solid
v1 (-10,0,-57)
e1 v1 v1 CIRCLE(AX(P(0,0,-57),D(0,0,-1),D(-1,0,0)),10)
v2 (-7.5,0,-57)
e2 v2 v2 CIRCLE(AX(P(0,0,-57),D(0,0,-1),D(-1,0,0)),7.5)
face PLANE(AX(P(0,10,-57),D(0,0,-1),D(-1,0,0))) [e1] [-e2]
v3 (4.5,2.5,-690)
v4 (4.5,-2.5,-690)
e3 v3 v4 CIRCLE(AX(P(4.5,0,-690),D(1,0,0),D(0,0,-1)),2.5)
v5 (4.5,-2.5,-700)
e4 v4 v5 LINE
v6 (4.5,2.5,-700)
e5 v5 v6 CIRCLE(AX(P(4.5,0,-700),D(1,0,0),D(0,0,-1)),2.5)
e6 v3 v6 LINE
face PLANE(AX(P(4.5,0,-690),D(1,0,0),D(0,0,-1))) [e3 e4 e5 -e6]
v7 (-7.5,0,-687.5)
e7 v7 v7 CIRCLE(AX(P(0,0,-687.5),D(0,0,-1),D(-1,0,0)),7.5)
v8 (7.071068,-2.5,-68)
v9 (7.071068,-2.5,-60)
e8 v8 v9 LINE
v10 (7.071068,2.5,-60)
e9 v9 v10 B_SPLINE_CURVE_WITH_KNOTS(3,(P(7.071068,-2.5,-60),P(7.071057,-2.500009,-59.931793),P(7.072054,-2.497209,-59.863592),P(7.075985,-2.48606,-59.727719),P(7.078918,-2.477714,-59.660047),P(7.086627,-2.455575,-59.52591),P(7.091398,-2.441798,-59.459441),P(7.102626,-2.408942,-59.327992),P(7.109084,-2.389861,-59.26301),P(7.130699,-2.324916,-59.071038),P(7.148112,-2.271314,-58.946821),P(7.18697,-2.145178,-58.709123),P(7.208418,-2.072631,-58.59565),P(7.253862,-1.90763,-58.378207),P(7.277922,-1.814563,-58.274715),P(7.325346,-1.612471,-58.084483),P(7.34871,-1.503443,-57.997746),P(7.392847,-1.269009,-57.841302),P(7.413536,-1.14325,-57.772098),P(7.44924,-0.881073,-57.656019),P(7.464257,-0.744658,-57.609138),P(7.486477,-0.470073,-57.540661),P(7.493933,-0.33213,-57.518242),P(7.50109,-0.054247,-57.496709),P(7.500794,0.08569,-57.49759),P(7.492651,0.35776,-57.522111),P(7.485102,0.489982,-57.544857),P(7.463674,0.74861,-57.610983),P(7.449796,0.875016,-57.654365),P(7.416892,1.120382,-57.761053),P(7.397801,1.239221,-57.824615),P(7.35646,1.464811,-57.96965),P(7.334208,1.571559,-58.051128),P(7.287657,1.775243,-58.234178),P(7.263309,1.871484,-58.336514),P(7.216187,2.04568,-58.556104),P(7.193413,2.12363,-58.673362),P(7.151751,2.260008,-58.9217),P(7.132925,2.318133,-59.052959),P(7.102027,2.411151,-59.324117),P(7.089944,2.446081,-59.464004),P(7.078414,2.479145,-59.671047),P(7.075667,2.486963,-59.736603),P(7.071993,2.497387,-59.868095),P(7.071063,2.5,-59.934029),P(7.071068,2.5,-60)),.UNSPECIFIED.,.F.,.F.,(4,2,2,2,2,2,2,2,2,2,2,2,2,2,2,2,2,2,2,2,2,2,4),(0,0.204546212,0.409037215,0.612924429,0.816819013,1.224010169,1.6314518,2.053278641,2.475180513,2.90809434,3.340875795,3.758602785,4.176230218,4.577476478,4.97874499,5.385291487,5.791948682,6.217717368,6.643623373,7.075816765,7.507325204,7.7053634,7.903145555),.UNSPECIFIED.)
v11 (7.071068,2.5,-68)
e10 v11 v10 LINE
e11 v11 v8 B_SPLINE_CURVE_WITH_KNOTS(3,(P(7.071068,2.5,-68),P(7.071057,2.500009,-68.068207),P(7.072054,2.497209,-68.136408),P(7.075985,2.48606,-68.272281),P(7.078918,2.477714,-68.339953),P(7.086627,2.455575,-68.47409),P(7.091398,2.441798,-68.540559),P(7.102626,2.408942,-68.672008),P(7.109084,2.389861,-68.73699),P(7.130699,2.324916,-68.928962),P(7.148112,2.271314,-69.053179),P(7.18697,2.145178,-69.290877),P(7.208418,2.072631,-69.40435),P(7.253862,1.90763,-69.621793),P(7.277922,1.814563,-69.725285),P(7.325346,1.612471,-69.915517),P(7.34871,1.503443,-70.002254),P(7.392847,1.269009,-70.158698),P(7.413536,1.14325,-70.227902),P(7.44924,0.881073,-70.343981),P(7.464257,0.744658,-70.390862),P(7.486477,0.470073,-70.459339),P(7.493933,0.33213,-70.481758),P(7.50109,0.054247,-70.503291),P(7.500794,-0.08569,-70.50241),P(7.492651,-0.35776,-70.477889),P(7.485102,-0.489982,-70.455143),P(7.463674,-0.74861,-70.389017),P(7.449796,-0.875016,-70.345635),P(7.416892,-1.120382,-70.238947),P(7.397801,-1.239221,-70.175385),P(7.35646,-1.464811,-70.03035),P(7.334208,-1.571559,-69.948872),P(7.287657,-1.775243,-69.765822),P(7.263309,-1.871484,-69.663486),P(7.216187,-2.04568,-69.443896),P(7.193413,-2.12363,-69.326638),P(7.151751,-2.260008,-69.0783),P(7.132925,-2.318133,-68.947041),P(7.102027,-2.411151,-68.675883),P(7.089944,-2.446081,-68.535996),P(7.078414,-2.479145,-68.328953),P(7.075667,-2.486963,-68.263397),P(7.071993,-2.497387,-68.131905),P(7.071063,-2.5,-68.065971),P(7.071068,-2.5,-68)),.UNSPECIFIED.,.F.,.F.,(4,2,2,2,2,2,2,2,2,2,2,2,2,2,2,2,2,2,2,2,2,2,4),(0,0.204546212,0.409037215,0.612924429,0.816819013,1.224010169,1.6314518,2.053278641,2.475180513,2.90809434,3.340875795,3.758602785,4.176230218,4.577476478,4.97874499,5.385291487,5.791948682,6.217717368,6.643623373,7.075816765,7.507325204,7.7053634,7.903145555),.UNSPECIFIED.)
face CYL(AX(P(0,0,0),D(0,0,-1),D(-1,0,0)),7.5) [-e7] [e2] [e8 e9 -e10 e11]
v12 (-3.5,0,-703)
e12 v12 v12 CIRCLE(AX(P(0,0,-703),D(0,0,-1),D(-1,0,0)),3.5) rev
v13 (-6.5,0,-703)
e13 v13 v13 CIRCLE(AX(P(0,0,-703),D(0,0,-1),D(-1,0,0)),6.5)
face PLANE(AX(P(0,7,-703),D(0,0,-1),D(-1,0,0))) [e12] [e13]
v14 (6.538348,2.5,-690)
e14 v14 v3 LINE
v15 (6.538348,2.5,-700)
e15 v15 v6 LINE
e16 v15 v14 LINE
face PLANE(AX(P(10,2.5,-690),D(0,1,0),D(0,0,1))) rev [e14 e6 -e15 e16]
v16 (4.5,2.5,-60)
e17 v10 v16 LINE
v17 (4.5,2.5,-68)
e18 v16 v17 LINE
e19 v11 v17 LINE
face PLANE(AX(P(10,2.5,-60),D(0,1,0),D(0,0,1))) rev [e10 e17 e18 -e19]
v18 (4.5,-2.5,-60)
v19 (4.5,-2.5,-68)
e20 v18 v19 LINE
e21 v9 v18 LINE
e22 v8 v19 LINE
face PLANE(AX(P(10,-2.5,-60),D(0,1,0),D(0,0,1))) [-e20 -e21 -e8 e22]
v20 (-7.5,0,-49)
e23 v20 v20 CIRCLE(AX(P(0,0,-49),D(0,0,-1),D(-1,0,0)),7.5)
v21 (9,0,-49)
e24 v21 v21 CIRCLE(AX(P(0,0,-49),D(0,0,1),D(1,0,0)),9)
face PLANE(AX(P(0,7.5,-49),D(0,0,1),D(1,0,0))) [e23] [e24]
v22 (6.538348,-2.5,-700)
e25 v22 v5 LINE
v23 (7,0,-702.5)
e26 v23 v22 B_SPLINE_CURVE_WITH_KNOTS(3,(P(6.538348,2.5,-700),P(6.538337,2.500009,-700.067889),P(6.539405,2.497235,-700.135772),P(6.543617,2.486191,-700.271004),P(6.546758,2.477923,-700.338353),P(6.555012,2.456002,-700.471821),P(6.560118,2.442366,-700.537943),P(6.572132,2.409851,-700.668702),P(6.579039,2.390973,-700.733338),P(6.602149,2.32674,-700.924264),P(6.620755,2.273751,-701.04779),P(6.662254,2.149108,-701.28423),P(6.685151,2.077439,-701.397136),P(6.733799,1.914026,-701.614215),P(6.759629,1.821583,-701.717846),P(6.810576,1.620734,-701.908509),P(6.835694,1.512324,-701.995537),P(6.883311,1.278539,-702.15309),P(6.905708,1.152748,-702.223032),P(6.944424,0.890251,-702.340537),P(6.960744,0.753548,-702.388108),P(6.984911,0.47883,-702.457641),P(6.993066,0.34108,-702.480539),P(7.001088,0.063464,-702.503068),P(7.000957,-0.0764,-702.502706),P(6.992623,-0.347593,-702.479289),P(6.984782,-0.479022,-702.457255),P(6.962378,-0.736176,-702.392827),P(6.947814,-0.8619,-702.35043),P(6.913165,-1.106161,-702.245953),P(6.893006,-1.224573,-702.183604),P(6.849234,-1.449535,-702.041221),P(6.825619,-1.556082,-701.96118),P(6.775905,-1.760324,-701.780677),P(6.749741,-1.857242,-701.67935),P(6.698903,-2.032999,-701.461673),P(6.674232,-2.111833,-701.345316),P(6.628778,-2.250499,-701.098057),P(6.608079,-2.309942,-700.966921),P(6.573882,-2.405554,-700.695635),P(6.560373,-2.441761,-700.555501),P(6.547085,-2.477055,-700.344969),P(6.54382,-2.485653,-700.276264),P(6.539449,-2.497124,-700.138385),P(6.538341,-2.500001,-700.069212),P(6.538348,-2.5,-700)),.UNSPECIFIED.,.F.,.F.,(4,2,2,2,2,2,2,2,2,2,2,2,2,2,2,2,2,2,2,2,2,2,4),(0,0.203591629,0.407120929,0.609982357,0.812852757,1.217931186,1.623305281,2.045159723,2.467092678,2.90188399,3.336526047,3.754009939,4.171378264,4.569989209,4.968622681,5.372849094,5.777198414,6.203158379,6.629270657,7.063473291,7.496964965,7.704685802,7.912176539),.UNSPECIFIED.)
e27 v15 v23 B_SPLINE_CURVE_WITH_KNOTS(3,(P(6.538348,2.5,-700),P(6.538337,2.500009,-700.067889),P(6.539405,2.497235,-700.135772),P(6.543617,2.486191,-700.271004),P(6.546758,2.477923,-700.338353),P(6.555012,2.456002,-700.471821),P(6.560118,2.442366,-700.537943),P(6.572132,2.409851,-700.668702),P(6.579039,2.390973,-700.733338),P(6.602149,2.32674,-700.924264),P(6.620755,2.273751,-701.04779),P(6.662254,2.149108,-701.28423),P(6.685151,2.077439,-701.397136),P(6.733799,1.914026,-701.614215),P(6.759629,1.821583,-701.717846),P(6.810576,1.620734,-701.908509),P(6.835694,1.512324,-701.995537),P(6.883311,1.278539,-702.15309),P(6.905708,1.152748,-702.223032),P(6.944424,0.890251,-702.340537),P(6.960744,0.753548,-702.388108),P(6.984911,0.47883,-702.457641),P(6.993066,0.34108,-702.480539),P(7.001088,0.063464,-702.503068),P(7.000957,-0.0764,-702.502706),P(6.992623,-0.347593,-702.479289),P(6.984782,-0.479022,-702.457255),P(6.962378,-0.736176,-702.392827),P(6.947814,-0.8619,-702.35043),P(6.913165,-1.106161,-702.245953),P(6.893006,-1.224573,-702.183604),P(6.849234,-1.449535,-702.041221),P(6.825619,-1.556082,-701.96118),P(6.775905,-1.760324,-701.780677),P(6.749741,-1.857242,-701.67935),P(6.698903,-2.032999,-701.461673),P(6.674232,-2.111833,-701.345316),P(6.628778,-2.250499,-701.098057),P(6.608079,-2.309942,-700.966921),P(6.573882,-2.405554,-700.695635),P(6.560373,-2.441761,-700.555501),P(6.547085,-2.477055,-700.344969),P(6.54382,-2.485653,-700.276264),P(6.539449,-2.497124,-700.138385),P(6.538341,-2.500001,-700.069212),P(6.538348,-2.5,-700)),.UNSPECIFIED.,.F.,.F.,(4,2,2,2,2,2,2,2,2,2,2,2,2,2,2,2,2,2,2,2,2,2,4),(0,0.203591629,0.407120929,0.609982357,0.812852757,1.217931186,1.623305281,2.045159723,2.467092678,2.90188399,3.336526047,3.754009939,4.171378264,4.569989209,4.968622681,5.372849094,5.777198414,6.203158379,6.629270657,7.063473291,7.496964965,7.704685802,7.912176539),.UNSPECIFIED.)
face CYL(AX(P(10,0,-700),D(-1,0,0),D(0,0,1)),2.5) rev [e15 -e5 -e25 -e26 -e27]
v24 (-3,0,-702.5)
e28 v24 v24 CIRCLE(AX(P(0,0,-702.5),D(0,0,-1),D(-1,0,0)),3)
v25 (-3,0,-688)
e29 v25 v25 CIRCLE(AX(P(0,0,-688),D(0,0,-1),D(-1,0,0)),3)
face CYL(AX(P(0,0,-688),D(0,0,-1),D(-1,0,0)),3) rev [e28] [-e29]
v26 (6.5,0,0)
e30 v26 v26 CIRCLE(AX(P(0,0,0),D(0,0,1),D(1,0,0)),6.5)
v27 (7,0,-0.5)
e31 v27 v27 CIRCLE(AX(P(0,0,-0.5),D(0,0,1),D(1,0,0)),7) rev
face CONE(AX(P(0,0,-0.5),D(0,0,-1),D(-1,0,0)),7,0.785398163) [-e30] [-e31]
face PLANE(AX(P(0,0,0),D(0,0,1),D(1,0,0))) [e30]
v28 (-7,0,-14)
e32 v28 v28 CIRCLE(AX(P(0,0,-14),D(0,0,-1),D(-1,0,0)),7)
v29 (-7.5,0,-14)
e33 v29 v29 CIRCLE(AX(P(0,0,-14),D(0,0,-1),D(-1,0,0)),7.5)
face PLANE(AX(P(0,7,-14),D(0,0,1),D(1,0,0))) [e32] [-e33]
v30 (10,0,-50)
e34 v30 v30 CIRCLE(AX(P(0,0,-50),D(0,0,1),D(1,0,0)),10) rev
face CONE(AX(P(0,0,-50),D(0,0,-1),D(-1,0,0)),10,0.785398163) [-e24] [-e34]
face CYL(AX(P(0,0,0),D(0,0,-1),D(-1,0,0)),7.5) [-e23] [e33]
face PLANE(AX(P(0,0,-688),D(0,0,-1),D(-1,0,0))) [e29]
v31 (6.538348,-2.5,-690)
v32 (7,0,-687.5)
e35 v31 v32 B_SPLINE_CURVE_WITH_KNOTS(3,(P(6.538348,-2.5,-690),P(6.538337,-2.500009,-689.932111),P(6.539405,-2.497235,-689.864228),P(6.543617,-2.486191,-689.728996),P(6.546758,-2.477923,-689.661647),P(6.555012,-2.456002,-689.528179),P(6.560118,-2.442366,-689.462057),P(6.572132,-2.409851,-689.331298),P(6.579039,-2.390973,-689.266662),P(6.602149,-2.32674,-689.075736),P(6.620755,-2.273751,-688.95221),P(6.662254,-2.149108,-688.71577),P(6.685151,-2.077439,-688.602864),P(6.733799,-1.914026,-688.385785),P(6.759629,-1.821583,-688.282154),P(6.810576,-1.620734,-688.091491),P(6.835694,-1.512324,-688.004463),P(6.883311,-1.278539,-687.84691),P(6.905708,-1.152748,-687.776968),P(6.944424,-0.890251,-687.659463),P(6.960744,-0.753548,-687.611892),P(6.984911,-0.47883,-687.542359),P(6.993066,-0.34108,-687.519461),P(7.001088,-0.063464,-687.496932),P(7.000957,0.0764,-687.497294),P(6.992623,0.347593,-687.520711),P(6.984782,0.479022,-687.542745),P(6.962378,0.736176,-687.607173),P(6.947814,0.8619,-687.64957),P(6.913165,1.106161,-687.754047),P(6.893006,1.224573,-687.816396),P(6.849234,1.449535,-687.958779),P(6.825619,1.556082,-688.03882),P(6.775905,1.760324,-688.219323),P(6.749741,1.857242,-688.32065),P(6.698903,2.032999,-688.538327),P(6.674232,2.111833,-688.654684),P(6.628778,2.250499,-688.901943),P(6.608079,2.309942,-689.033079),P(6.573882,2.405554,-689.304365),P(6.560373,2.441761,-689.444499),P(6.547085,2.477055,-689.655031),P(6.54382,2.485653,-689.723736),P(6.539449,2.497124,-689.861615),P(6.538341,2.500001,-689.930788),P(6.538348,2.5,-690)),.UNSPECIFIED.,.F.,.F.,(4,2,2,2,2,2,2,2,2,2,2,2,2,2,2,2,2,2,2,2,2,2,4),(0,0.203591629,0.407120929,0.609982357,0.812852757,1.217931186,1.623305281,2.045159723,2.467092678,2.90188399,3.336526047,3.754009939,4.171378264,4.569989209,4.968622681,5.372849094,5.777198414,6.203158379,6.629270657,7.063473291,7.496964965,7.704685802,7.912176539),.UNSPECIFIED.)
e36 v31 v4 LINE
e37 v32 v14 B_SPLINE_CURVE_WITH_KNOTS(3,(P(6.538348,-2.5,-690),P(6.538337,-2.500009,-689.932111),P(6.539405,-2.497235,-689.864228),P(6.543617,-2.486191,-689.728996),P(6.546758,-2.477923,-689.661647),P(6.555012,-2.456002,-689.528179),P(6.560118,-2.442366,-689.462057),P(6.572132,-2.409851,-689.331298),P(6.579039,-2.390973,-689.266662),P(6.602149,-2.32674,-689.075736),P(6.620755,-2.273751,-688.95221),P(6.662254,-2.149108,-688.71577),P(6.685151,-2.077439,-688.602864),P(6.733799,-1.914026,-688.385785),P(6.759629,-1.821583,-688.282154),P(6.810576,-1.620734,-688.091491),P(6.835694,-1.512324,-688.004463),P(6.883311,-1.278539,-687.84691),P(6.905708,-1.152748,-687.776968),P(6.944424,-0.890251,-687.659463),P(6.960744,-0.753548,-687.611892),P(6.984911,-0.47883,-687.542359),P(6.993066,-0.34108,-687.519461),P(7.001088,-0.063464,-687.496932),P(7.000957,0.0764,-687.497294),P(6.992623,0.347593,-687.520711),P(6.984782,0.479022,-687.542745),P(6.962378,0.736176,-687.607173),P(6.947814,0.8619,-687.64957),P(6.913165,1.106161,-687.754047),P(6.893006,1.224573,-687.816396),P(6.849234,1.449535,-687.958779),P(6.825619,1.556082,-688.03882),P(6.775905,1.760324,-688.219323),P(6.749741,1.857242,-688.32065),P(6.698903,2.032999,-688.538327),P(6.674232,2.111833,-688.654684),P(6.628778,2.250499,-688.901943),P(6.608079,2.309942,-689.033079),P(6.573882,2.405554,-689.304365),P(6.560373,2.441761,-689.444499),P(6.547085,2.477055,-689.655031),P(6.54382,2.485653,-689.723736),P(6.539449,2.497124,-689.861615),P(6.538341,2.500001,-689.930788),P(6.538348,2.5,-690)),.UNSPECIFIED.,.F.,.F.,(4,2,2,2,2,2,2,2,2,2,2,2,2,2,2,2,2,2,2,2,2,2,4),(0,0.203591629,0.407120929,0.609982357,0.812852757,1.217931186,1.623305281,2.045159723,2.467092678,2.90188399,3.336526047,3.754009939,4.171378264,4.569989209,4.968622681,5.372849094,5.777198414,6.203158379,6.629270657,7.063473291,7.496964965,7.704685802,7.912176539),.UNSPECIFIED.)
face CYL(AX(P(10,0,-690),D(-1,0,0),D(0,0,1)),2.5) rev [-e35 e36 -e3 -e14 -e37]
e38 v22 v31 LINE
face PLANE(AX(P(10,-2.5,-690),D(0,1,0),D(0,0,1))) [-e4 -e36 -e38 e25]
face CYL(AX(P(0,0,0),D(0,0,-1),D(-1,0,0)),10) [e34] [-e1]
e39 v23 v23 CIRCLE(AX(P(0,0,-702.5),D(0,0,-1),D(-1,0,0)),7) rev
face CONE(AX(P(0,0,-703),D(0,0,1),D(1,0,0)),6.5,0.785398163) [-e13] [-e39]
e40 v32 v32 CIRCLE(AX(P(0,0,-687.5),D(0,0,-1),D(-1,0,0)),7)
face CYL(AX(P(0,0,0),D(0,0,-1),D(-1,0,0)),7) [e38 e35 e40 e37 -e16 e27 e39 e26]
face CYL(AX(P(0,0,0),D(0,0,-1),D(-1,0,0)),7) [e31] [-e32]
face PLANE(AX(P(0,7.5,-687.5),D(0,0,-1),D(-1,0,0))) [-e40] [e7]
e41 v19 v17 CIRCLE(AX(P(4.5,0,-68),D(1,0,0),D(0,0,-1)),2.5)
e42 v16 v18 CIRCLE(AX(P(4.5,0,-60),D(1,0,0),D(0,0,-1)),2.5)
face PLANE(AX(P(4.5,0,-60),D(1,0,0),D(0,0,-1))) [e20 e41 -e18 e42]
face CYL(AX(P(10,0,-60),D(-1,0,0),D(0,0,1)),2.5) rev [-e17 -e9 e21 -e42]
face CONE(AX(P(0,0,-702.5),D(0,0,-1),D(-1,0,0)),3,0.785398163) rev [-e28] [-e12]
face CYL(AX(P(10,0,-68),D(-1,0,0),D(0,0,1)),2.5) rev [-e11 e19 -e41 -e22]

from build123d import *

# Parameters (mm, degrees)
CUT_EXTRUDE_1_DEPTH = 704.220626831
CHAMFER_1_SIZE      = 1
SKETCH_3_R          = 3
CUT_EXTRUDE_2_DEPTH = 15
CHAMFER_2_SIZE      = 0.5


with BuildPart() as part:
    # 草图1 → 旋转1 (revolve)
    with BuildSketch(Plane(origin=(0, 0, 0), x_dir=(0, 0, -1), z_dir=(1, 0, 0)), mode=Mode.PRIVATE) as revolve_1_sk:
        Polygon((0, 0), (0, 7), (14, 7), (14, 7.5), (49, 7.5), (49, 10), (57, 10), (57, 7.5), (687.5, 7.5), (687.5, 7), (703, 7), (703, 0), align=None)
    revolve(revolve_1_sk.sketch.rotate(Axis((0, 0, 0), (0, 0, 1)), 90), axis=Axis((0, 0, 0), (0, 0, 1)))

    # 草图2 → 切除-拉伸1 (cut, through all)
    with BuildSketch(Plane(origin=(4.5, 0, 0), x_dir=(0, 0, -1), z_dir=(1, 0, 0))):
        with BuildLine():
            Line((60, 2.5), (68, 2.5))
            ThreePointArc((68, 2.5), (70.5, 0), (68, -2.5))
            Line((68, -2.5), (60, -2.5))
            ThreePointArc((60, -2.5), (57.5, 0), (60, 2.5))
        make_face()
        with BuildLine():
            Line((690, 2.5), (700, 2.5))
            ThreePointArc((700, 2.5), (702.5, 0), (700, -2.5))
            Line((700, -2.5), (690, -2.5))
            ThreePointArc((690, -2.5), (687.5, 0), (690, 2.5))
        make_face()
    extrude(amount=CUT_EXTRUDE_1_DEPTH, mode=Mode.SUBTRACT)

    # 倒角1
    chamfer_1_edges = [part.edges().sort_by_distance(p)[0] for p in [
        (10, 0, -49),
    ]]
    chamfer(chamfer_1_edges, length=CHAMFER_1_SIZE)

    # 草图3 → 切除-拉伸2 (cut)
    with BuildSketch(Plane(origin=(0, 0, -703), x_dir=(-1, 0, 0), z_dir=(0, 0, -1))):
        Circle(SKETCH_3_R)
    extrude(amount=-CUT_EXTRUDE_2_DEPTH, mode=Mode.SUBTRACT)

    # 倒角2
    chamfer_2_edges = [part.edges().sort_by_distance(p)[0] for p in [
        (7, 0, 0),
        (3, 0, -703),
        (7, 0, -703),
    ]]
    chamfer(chamfer_2_edges, length=CHAMFER_2_SIZE - 0.0001)  # a hair under: the kernel refuses the full size


solid = part.part
